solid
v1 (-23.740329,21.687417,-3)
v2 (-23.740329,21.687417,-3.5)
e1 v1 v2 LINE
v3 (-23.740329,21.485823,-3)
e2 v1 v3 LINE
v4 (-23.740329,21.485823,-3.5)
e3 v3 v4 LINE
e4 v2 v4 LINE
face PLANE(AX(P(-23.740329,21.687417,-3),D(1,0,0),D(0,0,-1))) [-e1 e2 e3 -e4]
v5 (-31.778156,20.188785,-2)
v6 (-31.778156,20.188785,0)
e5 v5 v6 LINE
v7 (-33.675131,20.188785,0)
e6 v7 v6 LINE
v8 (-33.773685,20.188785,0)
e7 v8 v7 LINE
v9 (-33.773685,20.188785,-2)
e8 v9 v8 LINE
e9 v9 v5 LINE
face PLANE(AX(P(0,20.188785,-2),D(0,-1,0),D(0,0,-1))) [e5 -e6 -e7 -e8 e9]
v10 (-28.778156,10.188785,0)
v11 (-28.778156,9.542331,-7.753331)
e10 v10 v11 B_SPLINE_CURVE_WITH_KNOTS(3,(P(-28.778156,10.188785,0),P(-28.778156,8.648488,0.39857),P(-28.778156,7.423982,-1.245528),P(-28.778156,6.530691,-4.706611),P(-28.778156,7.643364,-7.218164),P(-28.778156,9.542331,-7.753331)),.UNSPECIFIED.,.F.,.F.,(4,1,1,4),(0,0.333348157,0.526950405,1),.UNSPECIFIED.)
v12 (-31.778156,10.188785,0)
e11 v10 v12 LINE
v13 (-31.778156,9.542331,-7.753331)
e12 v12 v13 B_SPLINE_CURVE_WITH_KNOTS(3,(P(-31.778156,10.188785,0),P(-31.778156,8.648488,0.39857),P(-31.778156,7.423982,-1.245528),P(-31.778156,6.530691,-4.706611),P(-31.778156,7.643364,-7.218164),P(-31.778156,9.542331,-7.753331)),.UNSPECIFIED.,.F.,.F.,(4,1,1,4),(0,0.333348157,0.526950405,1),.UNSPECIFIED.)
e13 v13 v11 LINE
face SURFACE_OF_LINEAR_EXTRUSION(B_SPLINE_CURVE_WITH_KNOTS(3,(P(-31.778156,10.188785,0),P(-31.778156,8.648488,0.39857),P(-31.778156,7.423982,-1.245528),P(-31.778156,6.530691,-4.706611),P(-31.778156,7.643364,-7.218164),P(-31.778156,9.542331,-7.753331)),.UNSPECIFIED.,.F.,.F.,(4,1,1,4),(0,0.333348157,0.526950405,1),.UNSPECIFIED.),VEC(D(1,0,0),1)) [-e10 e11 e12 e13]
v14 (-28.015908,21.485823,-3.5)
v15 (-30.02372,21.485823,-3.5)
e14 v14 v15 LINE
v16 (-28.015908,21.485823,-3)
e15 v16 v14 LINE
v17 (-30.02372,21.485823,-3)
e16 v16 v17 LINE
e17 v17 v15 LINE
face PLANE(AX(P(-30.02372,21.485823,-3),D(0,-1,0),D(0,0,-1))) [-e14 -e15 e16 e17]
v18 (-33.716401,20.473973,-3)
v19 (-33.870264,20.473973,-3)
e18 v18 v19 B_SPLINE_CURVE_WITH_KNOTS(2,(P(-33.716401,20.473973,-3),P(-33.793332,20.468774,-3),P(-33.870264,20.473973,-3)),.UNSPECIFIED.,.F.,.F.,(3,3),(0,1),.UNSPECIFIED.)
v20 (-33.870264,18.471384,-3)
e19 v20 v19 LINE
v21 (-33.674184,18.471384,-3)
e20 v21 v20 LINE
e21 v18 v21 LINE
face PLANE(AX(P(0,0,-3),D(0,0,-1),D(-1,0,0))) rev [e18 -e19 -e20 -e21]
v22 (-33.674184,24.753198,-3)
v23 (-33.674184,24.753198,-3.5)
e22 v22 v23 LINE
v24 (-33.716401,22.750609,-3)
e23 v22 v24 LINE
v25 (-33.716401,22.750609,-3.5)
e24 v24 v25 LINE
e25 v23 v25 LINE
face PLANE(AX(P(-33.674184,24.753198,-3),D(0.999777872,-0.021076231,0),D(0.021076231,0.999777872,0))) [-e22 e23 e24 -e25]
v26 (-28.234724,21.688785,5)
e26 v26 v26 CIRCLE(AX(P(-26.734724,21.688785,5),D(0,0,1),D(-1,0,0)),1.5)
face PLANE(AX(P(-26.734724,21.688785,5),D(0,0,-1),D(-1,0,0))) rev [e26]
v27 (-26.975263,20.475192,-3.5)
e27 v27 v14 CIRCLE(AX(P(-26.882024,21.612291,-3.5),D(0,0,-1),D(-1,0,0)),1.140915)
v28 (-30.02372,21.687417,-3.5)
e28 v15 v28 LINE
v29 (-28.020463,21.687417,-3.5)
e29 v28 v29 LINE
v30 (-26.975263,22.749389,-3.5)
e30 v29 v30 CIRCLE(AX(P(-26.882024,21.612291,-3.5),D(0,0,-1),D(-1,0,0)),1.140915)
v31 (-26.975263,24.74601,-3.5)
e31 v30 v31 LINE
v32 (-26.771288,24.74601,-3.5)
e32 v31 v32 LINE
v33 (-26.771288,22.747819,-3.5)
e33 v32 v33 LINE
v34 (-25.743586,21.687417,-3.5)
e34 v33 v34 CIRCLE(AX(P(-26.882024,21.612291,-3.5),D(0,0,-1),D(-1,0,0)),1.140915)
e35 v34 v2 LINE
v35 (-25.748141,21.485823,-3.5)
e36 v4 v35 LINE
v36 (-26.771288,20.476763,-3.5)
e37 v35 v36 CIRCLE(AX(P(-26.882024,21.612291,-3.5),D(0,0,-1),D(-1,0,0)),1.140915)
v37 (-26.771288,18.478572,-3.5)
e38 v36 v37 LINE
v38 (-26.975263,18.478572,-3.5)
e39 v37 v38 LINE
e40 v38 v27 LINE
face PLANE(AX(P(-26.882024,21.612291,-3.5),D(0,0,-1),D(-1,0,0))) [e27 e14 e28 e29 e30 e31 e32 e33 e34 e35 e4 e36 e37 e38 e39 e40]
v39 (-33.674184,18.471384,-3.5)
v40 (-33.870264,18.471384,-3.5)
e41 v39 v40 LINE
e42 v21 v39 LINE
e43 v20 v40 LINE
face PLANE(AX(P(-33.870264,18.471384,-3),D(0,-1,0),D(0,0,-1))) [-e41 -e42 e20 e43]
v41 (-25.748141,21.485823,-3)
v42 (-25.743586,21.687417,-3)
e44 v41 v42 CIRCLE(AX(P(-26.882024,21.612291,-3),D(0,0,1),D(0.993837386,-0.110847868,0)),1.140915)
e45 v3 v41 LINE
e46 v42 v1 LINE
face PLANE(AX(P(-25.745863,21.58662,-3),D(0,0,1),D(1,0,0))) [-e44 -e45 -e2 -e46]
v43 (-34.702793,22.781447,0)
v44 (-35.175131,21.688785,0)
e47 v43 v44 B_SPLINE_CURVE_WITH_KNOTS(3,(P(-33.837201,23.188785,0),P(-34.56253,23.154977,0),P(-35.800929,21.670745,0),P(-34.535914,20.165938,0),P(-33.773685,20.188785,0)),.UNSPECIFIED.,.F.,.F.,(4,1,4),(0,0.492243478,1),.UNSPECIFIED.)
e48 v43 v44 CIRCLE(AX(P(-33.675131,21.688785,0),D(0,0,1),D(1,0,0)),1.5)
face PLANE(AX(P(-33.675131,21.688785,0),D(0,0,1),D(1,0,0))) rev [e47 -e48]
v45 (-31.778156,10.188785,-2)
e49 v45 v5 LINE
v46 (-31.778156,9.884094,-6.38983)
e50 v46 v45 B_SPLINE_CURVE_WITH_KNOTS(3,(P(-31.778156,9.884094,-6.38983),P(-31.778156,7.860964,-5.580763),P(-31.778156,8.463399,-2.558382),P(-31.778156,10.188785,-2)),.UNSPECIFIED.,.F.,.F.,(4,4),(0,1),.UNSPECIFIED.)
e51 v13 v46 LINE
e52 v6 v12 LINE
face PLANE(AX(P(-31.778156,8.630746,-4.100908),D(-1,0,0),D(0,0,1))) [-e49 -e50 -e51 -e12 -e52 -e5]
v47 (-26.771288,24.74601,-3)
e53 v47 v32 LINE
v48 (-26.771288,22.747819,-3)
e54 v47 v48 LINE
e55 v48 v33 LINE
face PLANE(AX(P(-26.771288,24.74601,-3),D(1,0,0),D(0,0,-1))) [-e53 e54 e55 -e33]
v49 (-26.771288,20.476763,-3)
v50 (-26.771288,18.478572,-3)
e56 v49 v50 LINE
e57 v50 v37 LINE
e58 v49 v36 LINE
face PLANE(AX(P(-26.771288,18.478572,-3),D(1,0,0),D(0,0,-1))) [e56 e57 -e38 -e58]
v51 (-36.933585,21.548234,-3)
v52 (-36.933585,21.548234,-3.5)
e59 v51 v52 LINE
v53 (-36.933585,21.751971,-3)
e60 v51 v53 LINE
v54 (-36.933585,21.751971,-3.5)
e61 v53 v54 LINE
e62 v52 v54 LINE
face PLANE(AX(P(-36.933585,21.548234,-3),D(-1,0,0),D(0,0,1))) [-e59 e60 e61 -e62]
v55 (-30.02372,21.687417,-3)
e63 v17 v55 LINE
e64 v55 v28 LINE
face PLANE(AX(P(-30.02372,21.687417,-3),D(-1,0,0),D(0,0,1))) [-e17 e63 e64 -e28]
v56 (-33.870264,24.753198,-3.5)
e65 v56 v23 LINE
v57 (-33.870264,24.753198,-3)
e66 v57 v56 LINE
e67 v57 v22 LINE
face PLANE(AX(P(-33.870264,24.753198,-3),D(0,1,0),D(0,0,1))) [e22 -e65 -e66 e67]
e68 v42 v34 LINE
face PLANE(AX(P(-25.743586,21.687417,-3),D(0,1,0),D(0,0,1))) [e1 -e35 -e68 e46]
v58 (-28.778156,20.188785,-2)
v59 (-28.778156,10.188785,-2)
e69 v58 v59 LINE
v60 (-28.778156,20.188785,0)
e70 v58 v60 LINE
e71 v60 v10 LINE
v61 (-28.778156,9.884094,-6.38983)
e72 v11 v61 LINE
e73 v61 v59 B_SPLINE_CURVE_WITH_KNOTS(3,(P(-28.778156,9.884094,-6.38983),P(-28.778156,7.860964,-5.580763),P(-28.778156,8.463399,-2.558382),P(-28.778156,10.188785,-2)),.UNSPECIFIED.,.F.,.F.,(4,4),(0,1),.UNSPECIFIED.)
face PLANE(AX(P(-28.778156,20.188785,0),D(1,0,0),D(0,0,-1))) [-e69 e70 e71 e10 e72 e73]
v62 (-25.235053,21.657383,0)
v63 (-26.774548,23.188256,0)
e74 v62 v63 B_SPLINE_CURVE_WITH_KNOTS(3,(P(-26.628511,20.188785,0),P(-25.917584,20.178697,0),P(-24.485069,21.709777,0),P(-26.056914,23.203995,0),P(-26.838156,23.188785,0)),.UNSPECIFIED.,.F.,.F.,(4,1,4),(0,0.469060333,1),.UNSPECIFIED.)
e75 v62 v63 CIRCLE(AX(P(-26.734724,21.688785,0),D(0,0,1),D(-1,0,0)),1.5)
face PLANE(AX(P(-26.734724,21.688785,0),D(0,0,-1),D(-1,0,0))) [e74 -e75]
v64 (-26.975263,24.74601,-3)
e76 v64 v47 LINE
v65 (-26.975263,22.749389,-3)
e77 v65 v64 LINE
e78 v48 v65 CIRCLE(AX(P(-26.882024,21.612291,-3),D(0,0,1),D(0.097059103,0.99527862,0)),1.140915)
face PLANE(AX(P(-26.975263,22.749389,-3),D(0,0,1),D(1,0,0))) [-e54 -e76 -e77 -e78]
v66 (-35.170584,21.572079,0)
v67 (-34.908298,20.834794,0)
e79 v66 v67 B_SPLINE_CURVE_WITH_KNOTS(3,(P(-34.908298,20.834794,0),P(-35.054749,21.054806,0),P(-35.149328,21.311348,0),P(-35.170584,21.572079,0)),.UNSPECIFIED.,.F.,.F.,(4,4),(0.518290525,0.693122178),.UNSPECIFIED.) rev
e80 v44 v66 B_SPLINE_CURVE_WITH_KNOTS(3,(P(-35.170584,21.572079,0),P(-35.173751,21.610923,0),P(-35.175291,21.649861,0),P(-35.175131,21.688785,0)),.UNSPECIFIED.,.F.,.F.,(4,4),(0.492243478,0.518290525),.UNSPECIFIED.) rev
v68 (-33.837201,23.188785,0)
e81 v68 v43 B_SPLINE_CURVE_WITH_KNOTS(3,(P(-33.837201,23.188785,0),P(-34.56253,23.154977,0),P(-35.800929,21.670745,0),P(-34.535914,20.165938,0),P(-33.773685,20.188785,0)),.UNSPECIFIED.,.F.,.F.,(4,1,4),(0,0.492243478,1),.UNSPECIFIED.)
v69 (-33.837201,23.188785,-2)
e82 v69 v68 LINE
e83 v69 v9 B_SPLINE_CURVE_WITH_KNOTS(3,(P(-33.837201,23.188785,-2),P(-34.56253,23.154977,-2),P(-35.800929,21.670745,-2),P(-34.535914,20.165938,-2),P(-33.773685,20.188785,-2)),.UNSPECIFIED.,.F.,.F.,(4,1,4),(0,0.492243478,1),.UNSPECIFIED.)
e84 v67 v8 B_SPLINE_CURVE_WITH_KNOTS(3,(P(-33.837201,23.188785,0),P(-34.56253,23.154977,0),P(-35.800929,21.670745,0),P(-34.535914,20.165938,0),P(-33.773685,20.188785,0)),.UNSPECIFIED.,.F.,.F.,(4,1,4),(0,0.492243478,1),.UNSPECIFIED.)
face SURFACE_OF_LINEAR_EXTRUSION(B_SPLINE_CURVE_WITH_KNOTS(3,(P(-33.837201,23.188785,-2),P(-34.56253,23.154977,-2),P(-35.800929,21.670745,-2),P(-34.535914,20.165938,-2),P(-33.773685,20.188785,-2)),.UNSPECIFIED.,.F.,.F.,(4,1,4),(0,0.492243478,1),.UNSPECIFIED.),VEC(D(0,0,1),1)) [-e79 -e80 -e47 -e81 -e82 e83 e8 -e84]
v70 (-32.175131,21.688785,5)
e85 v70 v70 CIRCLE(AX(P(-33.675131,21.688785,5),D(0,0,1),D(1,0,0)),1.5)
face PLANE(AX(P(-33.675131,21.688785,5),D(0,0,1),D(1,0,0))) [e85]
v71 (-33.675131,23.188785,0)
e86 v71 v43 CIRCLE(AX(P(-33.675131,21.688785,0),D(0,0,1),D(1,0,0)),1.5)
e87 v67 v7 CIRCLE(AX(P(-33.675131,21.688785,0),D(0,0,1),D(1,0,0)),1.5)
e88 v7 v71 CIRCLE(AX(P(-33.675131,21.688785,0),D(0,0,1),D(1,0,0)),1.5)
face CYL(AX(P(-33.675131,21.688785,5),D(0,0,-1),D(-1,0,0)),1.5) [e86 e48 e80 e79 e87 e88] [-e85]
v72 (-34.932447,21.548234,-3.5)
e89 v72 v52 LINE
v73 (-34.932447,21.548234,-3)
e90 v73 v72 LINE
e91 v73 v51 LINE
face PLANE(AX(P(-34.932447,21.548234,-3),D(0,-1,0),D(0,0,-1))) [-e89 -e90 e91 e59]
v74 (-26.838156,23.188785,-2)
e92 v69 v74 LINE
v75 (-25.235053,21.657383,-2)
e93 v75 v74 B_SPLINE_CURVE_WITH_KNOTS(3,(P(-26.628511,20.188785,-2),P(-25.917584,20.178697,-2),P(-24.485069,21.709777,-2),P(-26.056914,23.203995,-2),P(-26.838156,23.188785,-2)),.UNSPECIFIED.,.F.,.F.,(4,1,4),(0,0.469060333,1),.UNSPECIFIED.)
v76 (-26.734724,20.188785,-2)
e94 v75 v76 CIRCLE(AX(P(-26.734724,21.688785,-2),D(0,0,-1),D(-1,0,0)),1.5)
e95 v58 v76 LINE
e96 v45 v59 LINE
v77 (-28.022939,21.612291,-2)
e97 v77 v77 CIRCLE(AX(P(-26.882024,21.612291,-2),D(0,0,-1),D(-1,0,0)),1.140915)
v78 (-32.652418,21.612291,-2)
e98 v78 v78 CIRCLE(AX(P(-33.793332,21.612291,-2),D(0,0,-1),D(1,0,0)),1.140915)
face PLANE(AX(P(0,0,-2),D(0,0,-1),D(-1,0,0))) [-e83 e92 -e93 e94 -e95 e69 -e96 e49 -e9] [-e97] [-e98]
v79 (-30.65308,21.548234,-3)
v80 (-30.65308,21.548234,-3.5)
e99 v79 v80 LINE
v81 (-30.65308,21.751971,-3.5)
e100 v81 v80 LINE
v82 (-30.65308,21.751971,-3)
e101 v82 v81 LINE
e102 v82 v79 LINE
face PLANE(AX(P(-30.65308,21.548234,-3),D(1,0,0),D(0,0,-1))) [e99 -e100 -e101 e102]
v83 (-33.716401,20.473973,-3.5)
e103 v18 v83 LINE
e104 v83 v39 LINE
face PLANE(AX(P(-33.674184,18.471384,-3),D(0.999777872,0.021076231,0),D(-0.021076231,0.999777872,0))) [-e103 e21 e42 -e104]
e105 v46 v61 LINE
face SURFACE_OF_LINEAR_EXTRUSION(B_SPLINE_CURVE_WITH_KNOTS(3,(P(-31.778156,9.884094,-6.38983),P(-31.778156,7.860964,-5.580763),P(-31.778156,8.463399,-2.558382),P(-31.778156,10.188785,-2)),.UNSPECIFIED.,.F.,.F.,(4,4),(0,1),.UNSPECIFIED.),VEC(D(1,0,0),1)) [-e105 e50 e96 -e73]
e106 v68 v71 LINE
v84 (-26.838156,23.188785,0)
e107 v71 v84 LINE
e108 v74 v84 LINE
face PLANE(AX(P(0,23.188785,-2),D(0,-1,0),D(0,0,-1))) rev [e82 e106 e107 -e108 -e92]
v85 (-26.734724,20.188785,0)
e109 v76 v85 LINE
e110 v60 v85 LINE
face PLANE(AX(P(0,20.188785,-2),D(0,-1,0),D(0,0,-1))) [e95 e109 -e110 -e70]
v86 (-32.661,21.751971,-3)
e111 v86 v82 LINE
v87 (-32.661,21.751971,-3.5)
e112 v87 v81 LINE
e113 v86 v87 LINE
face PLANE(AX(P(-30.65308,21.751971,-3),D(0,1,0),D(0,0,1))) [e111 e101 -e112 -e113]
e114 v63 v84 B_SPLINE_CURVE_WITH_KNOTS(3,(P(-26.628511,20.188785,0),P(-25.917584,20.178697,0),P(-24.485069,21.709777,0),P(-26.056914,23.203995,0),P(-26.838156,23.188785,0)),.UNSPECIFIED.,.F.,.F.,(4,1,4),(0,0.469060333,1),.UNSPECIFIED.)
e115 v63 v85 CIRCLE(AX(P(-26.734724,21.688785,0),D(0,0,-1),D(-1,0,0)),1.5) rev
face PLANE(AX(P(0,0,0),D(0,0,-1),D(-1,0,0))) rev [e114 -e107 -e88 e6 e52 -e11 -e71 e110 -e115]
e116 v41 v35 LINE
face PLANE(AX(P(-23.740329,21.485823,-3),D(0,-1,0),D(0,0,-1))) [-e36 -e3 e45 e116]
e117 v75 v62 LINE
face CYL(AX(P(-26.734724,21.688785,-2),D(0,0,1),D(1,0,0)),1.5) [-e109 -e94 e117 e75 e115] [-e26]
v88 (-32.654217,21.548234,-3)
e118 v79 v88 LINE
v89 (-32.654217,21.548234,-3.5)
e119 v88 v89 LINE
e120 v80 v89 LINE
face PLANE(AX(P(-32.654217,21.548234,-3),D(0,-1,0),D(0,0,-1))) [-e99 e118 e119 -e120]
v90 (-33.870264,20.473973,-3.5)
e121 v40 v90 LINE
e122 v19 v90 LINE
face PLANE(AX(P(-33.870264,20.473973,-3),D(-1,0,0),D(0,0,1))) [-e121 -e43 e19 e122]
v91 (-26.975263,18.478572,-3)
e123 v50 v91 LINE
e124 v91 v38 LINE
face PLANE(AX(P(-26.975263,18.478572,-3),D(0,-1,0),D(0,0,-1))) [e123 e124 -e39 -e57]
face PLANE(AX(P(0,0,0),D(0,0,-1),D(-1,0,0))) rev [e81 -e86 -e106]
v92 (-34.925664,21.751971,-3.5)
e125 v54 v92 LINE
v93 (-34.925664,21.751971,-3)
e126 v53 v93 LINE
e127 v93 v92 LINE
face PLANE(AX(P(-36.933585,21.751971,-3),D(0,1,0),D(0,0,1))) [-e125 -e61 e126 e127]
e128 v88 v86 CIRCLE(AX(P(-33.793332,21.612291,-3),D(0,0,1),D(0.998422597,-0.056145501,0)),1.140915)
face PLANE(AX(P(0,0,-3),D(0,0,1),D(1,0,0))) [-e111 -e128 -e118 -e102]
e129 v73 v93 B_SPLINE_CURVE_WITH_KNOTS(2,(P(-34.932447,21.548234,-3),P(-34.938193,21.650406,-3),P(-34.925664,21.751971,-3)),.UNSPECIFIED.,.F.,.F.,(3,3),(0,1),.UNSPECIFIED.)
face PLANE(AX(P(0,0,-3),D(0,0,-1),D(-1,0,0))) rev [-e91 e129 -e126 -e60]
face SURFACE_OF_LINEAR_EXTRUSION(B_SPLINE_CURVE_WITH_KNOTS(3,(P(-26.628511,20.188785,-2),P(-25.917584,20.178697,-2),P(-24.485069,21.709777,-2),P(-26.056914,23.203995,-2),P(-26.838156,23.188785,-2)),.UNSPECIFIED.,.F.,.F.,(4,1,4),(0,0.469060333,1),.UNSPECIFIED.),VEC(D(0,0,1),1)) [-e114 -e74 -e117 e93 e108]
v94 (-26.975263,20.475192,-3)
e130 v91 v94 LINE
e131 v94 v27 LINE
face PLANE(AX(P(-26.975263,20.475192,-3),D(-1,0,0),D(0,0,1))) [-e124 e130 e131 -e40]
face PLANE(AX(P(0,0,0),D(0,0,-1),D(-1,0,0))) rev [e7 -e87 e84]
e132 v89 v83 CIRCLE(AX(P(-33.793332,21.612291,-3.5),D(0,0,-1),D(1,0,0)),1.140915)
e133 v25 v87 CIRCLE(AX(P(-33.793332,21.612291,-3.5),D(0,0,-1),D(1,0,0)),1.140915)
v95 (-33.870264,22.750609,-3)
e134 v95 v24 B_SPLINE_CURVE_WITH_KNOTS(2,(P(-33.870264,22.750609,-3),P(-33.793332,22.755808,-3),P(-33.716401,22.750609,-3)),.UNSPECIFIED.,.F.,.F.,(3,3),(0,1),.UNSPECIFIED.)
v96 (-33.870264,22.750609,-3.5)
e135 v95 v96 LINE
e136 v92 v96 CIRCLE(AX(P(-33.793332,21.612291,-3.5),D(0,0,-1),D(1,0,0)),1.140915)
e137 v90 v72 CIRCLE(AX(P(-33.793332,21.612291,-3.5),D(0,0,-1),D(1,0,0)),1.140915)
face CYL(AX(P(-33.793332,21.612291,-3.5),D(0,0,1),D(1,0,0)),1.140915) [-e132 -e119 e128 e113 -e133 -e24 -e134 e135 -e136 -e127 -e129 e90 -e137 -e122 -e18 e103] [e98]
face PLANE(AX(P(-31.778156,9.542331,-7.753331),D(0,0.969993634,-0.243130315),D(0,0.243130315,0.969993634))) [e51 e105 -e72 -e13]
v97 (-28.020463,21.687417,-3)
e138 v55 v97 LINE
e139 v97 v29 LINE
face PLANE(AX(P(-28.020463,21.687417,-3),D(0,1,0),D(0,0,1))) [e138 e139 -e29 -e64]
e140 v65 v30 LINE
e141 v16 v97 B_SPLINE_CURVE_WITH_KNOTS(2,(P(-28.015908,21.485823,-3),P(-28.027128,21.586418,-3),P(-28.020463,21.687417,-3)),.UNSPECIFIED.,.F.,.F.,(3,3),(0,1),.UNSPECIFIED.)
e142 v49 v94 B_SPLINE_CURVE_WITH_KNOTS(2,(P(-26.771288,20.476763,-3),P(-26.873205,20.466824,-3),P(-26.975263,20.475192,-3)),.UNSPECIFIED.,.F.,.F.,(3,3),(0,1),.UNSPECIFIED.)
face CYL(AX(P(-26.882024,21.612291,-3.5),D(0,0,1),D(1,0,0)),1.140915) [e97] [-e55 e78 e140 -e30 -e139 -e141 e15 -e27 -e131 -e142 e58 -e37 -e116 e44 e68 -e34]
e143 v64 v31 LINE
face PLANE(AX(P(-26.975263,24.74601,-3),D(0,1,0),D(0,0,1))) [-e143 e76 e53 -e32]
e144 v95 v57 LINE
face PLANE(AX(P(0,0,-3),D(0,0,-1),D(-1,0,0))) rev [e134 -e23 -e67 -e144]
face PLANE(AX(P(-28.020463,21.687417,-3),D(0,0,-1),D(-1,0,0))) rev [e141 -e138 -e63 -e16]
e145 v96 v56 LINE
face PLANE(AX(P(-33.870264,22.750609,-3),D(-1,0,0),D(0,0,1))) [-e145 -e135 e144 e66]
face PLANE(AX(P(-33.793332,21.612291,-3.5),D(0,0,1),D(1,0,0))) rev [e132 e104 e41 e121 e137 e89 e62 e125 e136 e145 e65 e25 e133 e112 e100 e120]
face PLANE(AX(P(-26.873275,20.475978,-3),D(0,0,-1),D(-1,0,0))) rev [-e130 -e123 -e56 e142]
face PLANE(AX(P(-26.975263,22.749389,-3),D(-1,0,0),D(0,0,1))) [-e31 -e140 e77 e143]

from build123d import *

# Parameters (mm, degrees)
SKETCH_3_R        = 1.5
EXTRUDE_1_DEPTH   = 5
EXTRUDE_1_2_DEPTH = 5
EXTRUDE_2_DEPTH   = 2
SKETCH_5_W        = 2.853543821
SKETCH_5_H        = 2
EXTRUDE_3_DEPTH   = 10
EXTRUDE_4_DEPTH   = 3
SKETCH_10_R       = 1.140914645
EXTRUDE_5_DEPTH   = 1.5
EXTRUDE_7_DEPTH   = 0.5
EXTRUDE_8_DEPTH   = 0.5


with BuildPart() as part:
    # 草圖3 → 填料-伸長1 (new body)
    with BuildSketch(Plane.XY):
        with Locations((-33.675131422, 21.688784622)):
            Circle(SKETCH_3_R)
    extrude(amount=EXTRUDE_1_DEPTH)



with BuildPart() as body_2:
    # 草圖3 → Extrude 1 2 (new body)
    with BuildSketch(Plane.XY):
        with Locations((-26.734723807, 21.688784622)):
            Circle(SKETCH_3_R)
    extrude(amount=EXTRUDE_1_2_DEPTH)


with BuildPart() as part_1:
    add(part.part)

    add(body_2.part)  # 填料-伸長2 merges body 2
    # 草圖4 → 填料-伸長2 (add)
    with BuildSketch(Plane(origin=(0, 0, 0), x_dir=(-1, 0, 0), z_dir=(0, 0, -1))):
        with BuildLine():
            Line((26.734723807, 20.188784622), (33.773684802, 20.188784622))
            add(Edge.make_bspline(
                [(33.773684802, 20.188784622), (34.535913563, 20.165938291), (35.800929175, 21.670744954), (34.562530417, 23.154977058), (33.837200757, 23.188784622)],
                knots=[0.49596594, 0.49596594, 0.49596594, 0.49596594, 1.003722463, 1.49596594, 1.49596594, 1.49596594, 1.49596594], degree=3))
            Line((33.837200757, 23.188784622), (26.838155817, 23.188784622))
            add(Edge.make_bspline(
                [(26.838155817, 23.188784622), (26.073269192, 23.203676172), (25.257278865, 22.443518648), (25.235052535, 21.65738277)],
                knots=[0.985612962, 0.985612962, 0.985612962, 0.985612962, 1.505437172, 1.505437172, 1.505437172, 1.505437172], degree=3))
            ThreePointArc((25.235052535, 21.65738277), (25.685224588, 20.617079724), (26.734723807, 20.188784622))
        make_face()
    extrude(amount=EXTRUDE_2_DEPTH)

    # 草圖5 → 填料-伸長3 (add)
    with BuildSketch(Plane(origin=(0, 10.188784622, 0), x_dir=(-1, 0, 0), z_dir=(0, -1, 0))):
        with Locations((30.204927615, 1)):
            Rectangle(SKETCH_5_W, SKETCH_5_H)
    extrude(amount=-EXTRUDE_3_DEPTH)

    # 草圖8 → 填料-伸長4 (add)
    with BuildSketch(Plane(origin=(-28.778155704, 0, 0), x_dir=(0, 0, -1), z_dir=(1, 0, 0))):
        with BuildLine():
            Line((7.753330976, 9.542330649), (6.389830359, 9.884094062))
            add(Edge.make_bspline(
                [(2, 10.188784622), (2.558381759, 8.463399482), (5.5807632, 7.860963804), (6.389830359, 9.884094062)],
                knots=[0, 0, 0, 0, 1, 1, 1, 1], degree=3))
            Line((2, 10.188784622), (2, 20.188784622))
            Line((2, 20.188784622), (0, 20.188784622))
            Line((0, 20.188784622), (0, 10.188784622))
            add(Edge.make_bspline(
                [(0, 10.188784622), (-0.398570445, 8.648488045), (1.245527503, 7.423981535), (4.706611011, 6.530691208), (7.218164442, 7.643363971), (7.753330976, 9.542330649)],
                knots=[0, 0, 0, 0, 0.333348157, 0.526950405, 1, 1, 1, 1], degree=3))
        make_face()
    extrude(amount=-EXTRUDE_4_DEPTH)

    # 草圖10 → 填料-伸長5 (add)
    with BuildSketch(Plane(origin=(0, 0, -2), x_dir=(-1, 0, 0), z_dir=(0, 0, -1))):
        with Locations((26.882024428, 21.612290926)):
            Circle(SKETCH_10_R)
        with Locations((33.793332146, 21.612290926)):
            Circle(SKETCH_10_R)
    extrude(amount=EXTRUDE_5_DEPTH)

    # 草圖11 → 填料-伸長7 (add)
    with BuildSketch(Plane(origin=(0, 0, -3.5), x_dir=(-1, 0, 0), z_dir=(0, 0, -1))):
        Polygon((25.743585867, 21.687416623), (23.740328845, 21.687416623), (23.740328845, 21.48582297), (25.748140799, 21.48582297), align=None)
        Polygon((30.023720011, 21.687416623), (30.023720011, 21.48582297), (28.015908057, 21.48582297), (28.020462989, 21.687416623), align=None)
        Polygon((26.975262544, 20.475192477), (26.975262544, 18.478571509), (26.771288276, 18.478571509), (26.771288276, 20.476762972), align=None)
        Polygon((26.975262544, 24.746010342), (26.771288276, 24.746010342), (26.771288276, 22.747818879), (26.975262544, 22.749389374), align=None)
    extrude(amount=-EXTRUDE_7_DEPTH)

    # 草圖13 → 填料-伸長8 (add)
    with BuildSketch(Plane(origin=(0, 0, -3.5), x_dir=(-1, 0, 0), z_dir=(0, 0, -1))):
        Polygon((33.870263598, 20.473972965), (33.870263598, 18.471384146), (33.674184292, 18.471384146), (33.716400694, 20.473972965), align=None)
        Polygon((33.870263598, 22.750608887), (33.716400694, 22.750608887), (33.674184292, 24.753197705), (33.870263598, 24.753197705), align=None)
        Polygon((32.654217182, 21.548233701), (30.653079653, 21.548233701), (30.653079653, 21.751970744), (32.661000138, 21.751970744), align=None)
        Polygon((36.933584638, 21.548233701), (36.933584638, 21.751970744), (34.925664154, 21.751970744), (34.932447109, 21.548233701), align=None)
    extrude(amount=-EXTRUDE_8_DEPTH)


solid = part_1.part
